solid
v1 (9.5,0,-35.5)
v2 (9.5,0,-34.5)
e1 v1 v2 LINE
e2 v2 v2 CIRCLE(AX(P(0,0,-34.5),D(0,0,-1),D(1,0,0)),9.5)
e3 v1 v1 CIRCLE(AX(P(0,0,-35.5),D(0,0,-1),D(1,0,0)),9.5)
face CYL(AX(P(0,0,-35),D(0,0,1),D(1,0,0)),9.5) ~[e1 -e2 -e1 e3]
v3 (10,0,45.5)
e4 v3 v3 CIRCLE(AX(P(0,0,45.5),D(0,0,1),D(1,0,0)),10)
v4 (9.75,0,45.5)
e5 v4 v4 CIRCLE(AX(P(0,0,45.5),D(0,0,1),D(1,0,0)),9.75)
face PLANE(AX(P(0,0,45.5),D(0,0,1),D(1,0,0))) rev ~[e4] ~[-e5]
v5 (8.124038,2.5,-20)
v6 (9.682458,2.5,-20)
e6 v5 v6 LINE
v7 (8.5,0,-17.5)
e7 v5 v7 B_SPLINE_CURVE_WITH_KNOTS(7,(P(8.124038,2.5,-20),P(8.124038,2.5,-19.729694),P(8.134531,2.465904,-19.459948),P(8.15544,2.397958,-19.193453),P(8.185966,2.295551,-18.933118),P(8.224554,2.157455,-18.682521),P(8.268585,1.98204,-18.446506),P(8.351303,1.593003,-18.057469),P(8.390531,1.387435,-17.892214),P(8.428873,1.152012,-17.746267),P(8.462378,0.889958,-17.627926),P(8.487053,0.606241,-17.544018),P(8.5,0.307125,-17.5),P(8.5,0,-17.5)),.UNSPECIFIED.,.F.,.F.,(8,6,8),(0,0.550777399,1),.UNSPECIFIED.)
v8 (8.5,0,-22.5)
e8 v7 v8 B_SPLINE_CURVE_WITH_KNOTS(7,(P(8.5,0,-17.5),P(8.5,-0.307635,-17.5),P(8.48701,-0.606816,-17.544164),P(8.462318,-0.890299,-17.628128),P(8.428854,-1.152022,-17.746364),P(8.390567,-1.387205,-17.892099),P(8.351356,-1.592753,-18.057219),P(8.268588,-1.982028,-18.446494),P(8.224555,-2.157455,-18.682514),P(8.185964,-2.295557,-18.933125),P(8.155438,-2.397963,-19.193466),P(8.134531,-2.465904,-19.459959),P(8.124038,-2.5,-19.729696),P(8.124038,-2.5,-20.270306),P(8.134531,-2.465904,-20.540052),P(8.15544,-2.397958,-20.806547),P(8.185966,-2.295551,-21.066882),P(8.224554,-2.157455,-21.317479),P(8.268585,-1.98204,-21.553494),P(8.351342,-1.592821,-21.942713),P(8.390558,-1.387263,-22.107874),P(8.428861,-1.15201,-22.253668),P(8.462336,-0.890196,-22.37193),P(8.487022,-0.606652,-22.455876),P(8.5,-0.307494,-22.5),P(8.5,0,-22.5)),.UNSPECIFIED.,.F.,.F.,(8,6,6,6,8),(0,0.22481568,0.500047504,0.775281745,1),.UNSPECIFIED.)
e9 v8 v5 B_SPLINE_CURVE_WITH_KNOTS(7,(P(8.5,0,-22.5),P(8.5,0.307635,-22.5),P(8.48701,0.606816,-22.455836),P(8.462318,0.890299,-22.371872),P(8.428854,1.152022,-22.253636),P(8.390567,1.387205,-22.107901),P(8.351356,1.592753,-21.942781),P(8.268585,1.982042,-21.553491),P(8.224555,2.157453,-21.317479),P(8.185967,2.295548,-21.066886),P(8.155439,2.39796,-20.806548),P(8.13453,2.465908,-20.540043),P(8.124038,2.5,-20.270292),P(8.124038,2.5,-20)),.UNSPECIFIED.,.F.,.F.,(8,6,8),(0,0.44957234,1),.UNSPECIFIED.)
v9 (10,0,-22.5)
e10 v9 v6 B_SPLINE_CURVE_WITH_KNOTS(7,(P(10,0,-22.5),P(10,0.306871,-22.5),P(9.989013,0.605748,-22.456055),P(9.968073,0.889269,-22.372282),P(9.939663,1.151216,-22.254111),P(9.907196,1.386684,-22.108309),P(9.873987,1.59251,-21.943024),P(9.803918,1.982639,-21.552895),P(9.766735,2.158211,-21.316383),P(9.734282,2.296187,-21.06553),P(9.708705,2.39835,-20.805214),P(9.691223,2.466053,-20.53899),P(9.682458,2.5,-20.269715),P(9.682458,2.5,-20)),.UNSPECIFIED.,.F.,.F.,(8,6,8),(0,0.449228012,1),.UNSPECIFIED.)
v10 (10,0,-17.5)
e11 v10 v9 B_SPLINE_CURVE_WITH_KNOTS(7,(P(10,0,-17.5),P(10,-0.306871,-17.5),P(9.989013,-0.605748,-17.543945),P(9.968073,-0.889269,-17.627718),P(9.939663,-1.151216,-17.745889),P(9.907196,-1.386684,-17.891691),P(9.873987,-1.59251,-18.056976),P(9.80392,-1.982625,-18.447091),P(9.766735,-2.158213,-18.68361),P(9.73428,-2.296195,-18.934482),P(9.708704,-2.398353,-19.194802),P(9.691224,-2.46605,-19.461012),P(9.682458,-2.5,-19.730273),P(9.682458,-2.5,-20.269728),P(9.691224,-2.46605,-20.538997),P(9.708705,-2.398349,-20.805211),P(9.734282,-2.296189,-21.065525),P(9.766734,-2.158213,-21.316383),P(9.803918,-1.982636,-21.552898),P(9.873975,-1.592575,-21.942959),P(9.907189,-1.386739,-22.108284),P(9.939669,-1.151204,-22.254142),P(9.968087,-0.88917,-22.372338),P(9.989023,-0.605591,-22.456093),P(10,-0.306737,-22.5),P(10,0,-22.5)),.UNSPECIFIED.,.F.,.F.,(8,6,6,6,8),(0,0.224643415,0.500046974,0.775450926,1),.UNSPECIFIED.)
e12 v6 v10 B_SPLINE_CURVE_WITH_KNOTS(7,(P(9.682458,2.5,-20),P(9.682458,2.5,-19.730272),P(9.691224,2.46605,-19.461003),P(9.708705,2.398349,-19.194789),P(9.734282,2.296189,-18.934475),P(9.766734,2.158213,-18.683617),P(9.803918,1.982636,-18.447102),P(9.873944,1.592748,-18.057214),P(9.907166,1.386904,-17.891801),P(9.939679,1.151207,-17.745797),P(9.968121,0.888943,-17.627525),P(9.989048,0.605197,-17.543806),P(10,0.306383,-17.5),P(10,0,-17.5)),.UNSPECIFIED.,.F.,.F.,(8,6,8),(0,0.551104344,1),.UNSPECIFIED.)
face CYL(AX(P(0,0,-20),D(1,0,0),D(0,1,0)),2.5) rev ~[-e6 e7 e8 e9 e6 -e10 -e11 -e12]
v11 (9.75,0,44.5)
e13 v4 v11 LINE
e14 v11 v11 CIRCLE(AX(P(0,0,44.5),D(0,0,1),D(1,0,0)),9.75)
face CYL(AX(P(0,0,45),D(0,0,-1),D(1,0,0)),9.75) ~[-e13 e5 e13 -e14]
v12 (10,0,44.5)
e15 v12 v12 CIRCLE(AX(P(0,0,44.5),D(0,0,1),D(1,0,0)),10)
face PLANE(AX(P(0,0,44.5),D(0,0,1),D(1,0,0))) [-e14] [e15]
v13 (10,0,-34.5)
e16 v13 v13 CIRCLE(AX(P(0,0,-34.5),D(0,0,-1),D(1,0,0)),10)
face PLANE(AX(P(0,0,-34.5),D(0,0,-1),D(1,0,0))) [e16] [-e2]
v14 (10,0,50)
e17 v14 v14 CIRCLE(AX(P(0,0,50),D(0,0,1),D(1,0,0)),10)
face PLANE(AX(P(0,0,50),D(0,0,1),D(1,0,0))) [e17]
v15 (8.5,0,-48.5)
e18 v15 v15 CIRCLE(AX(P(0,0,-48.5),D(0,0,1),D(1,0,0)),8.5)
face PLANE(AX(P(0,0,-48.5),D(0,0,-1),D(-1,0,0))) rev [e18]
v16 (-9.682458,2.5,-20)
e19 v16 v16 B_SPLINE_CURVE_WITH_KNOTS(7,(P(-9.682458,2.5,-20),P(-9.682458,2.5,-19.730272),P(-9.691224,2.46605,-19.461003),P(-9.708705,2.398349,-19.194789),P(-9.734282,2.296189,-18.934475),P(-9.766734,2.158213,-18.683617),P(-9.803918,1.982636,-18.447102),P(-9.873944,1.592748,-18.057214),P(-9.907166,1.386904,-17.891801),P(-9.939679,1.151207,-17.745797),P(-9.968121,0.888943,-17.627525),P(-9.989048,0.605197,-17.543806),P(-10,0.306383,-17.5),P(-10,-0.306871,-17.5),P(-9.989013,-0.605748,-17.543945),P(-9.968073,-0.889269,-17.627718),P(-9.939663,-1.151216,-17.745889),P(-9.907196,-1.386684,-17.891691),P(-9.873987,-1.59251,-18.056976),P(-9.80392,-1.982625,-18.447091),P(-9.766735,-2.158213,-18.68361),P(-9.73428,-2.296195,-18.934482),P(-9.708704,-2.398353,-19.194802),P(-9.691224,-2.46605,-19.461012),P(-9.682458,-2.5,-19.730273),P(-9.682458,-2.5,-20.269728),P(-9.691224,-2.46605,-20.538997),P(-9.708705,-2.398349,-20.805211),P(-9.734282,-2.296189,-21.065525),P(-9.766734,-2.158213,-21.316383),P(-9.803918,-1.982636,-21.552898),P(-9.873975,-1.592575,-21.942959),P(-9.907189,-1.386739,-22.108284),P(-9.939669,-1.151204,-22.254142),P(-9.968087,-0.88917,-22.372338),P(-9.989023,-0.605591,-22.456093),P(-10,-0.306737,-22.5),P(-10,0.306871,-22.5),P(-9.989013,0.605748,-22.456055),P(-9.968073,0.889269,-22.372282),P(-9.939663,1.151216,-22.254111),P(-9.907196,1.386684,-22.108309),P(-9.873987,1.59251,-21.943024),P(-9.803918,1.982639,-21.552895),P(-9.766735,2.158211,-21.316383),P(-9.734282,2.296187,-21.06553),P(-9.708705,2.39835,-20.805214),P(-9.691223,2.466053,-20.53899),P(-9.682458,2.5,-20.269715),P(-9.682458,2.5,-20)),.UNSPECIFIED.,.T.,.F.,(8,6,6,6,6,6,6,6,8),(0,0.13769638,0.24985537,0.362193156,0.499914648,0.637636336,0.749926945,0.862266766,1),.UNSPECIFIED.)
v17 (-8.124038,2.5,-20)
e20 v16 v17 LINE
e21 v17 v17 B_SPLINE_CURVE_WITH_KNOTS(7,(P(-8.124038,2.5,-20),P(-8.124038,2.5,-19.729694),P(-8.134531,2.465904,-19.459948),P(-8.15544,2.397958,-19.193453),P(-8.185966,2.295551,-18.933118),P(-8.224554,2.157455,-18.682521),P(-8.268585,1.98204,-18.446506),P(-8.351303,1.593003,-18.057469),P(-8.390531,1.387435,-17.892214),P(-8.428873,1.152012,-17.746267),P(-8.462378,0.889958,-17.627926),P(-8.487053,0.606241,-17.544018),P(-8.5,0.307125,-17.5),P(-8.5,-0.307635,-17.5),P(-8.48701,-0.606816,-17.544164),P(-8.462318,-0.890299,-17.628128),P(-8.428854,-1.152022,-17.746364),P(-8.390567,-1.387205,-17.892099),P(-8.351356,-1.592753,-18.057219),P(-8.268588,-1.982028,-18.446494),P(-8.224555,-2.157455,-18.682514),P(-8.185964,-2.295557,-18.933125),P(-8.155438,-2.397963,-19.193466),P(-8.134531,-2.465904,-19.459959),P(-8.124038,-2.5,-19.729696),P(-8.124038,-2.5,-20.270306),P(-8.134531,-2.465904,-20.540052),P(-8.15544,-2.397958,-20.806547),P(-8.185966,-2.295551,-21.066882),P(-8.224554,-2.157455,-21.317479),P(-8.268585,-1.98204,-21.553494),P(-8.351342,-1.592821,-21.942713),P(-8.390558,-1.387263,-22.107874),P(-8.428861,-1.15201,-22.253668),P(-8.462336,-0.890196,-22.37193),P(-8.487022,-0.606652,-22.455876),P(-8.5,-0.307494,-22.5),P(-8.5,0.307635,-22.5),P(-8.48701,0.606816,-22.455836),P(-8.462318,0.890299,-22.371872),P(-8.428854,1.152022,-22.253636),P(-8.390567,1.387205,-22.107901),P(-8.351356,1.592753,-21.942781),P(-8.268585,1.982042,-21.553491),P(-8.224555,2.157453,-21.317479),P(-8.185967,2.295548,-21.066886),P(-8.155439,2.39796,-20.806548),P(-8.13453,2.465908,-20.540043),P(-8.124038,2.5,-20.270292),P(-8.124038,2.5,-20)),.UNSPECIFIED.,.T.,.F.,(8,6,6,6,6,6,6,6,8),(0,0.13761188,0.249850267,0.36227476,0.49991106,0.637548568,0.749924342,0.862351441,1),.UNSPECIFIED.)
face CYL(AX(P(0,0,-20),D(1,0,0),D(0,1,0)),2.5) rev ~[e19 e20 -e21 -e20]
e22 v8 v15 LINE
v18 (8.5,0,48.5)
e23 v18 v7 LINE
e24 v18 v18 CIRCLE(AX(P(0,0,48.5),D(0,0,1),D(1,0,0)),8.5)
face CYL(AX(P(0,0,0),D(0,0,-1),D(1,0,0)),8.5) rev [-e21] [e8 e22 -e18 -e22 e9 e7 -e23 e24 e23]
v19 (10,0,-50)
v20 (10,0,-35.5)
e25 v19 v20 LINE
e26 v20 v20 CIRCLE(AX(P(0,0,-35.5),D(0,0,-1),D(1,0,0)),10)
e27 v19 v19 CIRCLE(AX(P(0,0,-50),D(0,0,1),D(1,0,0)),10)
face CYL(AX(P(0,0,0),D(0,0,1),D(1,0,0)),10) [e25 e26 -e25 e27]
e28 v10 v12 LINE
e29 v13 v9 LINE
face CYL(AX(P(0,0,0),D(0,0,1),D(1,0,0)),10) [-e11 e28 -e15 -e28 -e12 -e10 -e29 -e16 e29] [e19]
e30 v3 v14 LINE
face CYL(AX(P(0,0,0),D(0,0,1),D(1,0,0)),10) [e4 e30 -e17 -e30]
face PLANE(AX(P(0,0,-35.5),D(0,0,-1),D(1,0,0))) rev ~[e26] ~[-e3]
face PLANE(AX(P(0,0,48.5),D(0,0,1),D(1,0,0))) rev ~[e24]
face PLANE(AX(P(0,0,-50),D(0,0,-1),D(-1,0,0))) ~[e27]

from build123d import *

# Parameters (mm, degrees)
F0_R      = 10
F0_R_2    = 8.5
F1_DEPTH  = 50
F2_R      = 8.5
F3_DEPTH  = 1.5
F4_R      = 2.5
F5_DEPTH  = 12.5
F7_R      = 10
F7_R_2    = 9.75
F8_DEPTH  = 0.5
F10_R     = 10
F10_R_2   = 9.5
F11_DEPTH = 0.5


# Not quite as in the source:
# - a pattern or mirror of a feature is missing from the dataset's text; its kind, count and spacing are read off the source's solid


with BuildPart() as f1:
    # F0 (on Top) → F1 (new body, symmetric)
    with BuildSketch(Plane.XY):
        Circle(F0_R)
        Circle(F0_R_2, mode=Mode.SUBTRACT)
    extrude(amount=F1_DEPTH, both=True)

    # F2 (on face) → F3 (join)
    with BuildSketch(Plane.XY.offset(50)):
        Circle(F2_R)
    f3 = extrude(amount=-F3_DEPTH)

    # F3_copies: F3 across plane
    add(f3.mirror(Plane(origin=(0, 0, 0), x_dir=(-1, 0, 0), z_dir=(0, 0, -1))))

    # F4 (on Right) → F5 (cut, symmetric)
    with BuildSketch(Plane.YZ):
        with Locations((0, -20)):
            Circle(F4_R)
    extrude(amount=F5_DEPTH, both=True, mode=Mode.SUBTRACT)

    # F7 (on offset) → F8 (cut, symmetric)
    with BuildSketch(Plane.XY.offset(45)):
        Circle(F7_R)
        Circle(F7_R_2, mode=Mode.SUBTRACT)
    extrude(amount=F8_DEPTH, both=True, mode=Mode.SUBTRACT)

    # F10 (on face) → F11 (cut, symmetric)
    with BuildSketch(Plane(origin=(0, 0, -35), x_dir=(1, 0, 0), z_dir=(0, 0, -1))):
        Circle(F10_R)
        Circle(F10_R_2, mode=Mode.SUBTRACT)
    extrude(amount=F11_DEPTH, both=True, mode=Mode.SUBTRACT)


solid = f1.part
